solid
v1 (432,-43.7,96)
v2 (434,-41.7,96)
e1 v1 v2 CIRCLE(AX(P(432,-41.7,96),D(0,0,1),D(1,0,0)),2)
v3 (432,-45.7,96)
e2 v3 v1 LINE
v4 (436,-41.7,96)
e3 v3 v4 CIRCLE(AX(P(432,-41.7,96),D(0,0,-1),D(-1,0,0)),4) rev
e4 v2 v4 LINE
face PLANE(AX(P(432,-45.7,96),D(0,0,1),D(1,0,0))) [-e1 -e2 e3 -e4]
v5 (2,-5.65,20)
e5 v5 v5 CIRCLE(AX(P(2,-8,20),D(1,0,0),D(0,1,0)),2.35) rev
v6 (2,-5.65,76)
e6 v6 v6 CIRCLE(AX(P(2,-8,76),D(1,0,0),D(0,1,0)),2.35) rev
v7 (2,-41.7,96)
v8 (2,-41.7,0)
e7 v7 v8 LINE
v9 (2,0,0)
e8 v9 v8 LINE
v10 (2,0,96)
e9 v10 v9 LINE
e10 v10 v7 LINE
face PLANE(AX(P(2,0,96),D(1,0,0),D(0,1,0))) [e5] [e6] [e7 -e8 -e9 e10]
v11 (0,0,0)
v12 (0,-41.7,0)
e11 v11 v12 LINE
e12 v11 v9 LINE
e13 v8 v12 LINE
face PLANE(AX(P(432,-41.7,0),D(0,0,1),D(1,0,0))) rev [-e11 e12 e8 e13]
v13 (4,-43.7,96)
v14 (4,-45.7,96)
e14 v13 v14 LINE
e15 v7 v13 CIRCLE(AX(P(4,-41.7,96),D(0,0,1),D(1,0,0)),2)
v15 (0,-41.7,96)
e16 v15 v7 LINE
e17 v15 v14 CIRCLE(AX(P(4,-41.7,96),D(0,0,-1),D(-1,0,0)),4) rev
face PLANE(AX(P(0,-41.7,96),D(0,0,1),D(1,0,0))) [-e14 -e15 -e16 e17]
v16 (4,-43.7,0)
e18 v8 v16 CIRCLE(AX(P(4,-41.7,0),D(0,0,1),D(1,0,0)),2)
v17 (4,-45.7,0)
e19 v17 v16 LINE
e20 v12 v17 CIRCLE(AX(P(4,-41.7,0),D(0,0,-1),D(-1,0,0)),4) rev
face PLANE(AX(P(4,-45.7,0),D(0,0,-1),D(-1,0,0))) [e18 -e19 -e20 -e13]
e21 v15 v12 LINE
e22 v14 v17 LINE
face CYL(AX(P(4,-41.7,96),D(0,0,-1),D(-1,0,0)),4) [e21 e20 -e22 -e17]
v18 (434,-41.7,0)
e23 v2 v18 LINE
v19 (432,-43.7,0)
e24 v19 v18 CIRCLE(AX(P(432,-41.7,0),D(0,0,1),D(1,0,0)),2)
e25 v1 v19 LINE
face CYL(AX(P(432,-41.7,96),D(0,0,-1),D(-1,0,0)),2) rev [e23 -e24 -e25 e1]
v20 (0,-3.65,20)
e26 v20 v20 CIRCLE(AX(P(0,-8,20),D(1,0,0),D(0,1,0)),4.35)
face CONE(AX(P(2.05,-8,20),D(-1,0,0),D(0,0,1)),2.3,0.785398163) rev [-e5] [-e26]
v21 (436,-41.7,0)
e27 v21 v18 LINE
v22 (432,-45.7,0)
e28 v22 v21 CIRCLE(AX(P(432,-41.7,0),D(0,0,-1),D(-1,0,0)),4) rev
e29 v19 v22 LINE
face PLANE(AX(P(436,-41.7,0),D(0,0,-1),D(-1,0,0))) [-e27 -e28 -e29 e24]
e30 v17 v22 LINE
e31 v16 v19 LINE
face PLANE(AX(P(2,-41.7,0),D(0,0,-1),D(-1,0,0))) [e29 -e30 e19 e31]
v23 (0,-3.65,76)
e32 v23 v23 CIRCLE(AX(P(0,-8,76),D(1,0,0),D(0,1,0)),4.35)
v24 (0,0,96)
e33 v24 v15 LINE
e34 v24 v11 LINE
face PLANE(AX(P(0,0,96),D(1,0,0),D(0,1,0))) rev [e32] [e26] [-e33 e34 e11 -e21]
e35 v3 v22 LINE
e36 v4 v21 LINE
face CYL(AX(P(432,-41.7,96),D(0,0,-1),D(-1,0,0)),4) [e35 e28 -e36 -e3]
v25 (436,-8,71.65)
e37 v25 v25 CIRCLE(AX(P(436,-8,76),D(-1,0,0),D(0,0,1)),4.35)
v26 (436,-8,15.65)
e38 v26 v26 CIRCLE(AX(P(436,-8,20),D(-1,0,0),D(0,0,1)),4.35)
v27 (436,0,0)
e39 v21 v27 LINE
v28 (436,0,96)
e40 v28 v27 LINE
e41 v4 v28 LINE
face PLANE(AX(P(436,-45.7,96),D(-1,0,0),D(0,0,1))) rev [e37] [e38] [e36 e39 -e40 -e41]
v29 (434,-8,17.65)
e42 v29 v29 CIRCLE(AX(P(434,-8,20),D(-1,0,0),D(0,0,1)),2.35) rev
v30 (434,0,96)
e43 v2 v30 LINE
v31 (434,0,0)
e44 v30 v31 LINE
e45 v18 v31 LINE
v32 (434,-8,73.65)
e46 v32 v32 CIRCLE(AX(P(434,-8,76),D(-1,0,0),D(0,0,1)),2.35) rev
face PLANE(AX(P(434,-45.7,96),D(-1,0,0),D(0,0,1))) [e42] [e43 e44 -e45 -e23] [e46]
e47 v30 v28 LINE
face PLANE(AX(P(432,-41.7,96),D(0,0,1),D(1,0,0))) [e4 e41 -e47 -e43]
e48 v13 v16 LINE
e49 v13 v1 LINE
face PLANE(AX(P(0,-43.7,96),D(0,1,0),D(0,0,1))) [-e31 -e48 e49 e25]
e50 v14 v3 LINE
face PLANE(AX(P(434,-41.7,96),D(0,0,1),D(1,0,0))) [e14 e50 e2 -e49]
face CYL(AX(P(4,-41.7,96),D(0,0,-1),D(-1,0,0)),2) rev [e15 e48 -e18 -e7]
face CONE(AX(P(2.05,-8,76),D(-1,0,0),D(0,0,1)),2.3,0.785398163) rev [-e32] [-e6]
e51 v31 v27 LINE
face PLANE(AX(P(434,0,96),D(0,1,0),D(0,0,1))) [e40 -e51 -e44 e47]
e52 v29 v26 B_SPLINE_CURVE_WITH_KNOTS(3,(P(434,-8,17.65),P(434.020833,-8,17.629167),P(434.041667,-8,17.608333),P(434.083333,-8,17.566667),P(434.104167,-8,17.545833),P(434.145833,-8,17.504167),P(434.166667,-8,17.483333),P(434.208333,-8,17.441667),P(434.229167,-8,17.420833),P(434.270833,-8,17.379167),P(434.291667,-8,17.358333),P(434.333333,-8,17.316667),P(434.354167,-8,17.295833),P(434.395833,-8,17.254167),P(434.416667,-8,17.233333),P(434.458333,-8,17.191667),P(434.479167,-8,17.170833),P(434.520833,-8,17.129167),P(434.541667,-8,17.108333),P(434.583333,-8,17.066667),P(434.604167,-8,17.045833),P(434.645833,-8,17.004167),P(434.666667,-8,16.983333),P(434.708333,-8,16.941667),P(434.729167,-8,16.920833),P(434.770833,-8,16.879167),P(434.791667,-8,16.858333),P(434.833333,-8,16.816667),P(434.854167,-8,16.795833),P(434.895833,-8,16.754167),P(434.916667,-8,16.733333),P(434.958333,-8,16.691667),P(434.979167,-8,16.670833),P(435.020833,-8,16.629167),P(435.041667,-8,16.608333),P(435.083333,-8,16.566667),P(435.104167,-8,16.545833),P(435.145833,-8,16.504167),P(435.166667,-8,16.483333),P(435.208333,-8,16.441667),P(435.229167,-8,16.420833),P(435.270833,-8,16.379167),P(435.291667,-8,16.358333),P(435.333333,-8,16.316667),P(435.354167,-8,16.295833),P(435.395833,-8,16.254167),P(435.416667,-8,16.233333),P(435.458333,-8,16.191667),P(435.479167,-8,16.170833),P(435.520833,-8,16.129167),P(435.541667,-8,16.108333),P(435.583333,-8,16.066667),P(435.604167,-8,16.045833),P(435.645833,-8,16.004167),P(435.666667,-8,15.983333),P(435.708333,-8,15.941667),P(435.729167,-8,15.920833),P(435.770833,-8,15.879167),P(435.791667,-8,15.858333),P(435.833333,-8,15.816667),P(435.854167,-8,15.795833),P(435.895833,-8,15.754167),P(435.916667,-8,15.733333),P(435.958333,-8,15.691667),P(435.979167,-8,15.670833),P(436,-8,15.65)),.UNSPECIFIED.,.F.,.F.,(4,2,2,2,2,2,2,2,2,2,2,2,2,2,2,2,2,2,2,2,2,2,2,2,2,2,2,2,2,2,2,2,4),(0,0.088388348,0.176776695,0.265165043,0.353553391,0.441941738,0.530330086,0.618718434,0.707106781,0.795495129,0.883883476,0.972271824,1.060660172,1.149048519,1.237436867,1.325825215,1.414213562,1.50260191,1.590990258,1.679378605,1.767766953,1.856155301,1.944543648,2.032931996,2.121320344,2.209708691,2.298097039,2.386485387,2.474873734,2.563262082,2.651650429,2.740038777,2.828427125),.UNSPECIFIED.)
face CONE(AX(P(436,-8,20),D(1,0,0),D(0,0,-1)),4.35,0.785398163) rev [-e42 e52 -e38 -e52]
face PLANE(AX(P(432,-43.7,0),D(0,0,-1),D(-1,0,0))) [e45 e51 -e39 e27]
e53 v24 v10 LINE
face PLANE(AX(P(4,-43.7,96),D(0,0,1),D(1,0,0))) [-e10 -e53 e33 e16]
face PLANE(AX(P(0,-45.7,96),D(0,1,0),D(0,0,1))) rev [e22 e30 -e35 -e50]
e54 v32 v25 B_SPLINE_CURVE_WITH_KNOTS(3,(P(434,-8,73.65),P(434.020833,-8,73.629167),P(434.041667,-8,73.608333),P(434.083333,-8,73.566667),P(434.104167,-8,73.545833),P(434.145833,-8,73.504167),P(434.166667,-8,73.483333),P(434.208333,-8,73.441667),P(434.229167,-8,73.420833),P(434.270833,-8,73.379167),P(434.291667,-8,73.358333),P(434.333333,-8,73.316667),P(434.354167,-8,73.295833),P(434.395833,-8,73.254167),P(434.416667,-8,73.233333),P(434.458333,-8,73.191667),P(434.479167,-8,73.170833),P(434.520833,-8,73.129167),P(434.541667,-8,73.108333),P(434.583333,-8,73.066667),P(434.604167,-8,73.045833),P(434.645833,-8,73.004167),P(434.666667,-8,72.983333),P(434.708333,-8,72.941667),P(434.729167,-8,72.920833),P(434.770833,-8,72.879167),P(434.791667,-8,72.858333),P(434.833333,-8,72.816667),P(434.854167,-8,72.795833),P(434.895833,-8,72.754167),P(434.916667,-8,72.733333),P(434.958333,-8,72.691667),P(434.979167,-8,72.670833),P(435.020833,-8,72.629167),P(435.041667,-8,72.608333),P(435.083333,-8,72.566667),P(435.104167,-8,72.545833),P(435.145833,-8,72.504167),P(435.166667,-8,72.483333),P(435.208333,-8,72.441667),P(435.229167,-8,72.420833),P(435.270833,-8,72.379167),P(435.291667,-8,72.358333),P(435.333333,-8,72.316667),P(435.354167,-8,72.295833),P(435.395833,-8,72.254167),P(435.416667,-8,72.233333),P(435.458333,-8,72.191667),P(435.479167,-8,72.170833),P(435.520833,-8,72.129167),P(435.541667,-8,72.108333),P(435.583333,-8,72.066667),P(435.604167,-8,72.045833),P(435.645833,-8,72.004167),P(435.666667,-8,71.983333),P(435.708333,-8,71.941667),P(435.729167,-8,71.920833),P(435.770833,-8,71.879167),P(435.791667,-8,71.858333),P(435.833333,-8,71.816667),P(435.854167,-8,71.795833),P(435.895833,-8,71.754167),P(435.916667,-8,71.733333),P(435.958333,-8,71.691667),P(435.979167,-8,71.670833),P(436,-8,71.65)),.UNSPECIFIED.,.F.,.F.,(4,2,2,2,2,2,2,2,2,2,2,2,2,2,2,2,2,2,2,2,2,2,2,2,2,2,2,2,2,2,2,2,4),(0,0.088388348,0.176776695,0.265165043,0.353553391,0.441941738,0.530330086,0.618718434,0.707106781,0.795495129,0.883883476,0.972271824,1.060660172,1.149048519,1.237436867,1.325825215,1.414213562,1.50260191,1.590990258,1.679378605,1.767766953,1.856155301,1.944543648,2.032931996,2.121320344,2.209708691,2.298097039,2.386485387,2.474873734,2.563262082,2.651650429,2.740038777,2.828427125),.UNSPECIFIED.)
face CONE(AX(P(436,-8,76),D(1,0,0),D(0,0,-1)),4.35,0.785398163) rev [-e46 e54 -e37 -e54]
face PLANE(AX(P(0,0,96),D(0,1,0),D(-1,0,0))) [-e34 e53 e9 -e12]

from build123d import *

# Parameters (mm, degrees)
SM_BASE_FLANGE_1_DEPTH = 96
SKETCH_2_R             = 2.3
CUT_EXTRUDE_1_DEPTH    = 449.776659375
CHAMFER_1_SIZE         = 2.05


# Sheet-metal steps are written as plain solids
with BuildPart() as part:
    # Sketch 1 → Базовая кромка1 (new body)
    with BuildSketch(Plane.XY):
        with BuildLine():
            Line((0, 0), (0, -41.7))
            ThreePointArc((0, -41.7), (1.171572875, -44.528427125), (4, -45.7))
            Line((4, -45.7), (432, -45.7))
            ThreePointArc((432, -45.7), (434.828427125, -44.528427125), (436, -41.7))
            Line((436, -41.7), (436, 0))
            Line((436, 0), (434, 0))
            Line((434, 0), (434, -41.7))
            ThreePointArc((434, -41.7), (433.414213562, -43.114213562), (432, -43.7))
            Line((432, -43.7), (4, -43.7))
            ThreePointArc((4, -43.7), (2.585786438, -43.114213562), (2, -41.7))
            Line((2, -41.7), (2, 0))
            Line((2, 0), (0, 0))
        make_face()
    extrude(amount=SM_BASE_FLANGE_1_DEPTH)

    # Sketch 2 → Вырез-Вытянуть1 (cut, through all)
    with BuildSketch(Plane.ZY):
        with Locations(Location((20, -8, 0), (0, 0, 270))):
            Circle(SKETCH_2_R)
        with Locations(Location((76, -8, 0), (0, 0, 270))):
            Circle(SKETCH_2_R)
    extrude(amount=-CUT_EXTRUDE_1_DEPTH, mode=Mode.SUBTRACT)

    # Фаска1
    # the kernel refuses this chamfer: 2.05 mm, written as the material it takes off along each edge
    with BuildSketch(Plane(origin=(436, -8, 20), x_dir=(0, -1, 0), z_dir=(0, 0, -1))) as chamfer_1_piece_1:
        Polygon((2.3 + CHAMFER_1_SIZE, 0), (2.3, CHAMFER_1_SIZE), (2.3, 0), align=None)
    revolve(axis=Axis((436, -8, 20), (-1, 0, 0)), mode=Mode.SUBTRACT)
    with BuildSketch(Plane(origin=(436, -8, 76), x_dir=(0, -1, 0), z_dir=(0, 0, -1))) as chamfer_1_piece_2:
        Polygon((2.3 + CHAMFER_1_SIZE, 0), (2.3, CHAMFER_1_SIZE), (2.3, 0), align=None)
    revolve(axis=Axis((436, -8, 76), (-1, 0, 0)), mode=Mode.SUBTRACT)
    with BuildSketch(Plane(origin=(0, -8, 76), x_dir=(0, -1, 0), z_dir=(0, 0, -1))) as chamfer_1_piece_3:
        Polygon((2.3, -CHAMFER_1_SIZE), (2.3 + CHAMFER_1_SIZE, 0), (2.3, 0), align=None)
    revolve(axis=Axis((0, -8, 76), (-1, 0, 0)), mode=Mode.SUBTRACT)
    with BuildSketch(Plane(origin=(0, -8, 20), x_dir=(0, -1, 0), z_dir=(0, 0, -1))) as chamfer_1_piece_4:
        Polygon((2.3, -CHAMFER_1_SIZE), (2.3 + CHAMFER_1_SIZE, 0), (2.3, 0), align=None)
    revolve(axis=Axis((0, -8, 20), (-1, 0, 0)), mode=Mode.SUBTRACT)


solid = part.part
